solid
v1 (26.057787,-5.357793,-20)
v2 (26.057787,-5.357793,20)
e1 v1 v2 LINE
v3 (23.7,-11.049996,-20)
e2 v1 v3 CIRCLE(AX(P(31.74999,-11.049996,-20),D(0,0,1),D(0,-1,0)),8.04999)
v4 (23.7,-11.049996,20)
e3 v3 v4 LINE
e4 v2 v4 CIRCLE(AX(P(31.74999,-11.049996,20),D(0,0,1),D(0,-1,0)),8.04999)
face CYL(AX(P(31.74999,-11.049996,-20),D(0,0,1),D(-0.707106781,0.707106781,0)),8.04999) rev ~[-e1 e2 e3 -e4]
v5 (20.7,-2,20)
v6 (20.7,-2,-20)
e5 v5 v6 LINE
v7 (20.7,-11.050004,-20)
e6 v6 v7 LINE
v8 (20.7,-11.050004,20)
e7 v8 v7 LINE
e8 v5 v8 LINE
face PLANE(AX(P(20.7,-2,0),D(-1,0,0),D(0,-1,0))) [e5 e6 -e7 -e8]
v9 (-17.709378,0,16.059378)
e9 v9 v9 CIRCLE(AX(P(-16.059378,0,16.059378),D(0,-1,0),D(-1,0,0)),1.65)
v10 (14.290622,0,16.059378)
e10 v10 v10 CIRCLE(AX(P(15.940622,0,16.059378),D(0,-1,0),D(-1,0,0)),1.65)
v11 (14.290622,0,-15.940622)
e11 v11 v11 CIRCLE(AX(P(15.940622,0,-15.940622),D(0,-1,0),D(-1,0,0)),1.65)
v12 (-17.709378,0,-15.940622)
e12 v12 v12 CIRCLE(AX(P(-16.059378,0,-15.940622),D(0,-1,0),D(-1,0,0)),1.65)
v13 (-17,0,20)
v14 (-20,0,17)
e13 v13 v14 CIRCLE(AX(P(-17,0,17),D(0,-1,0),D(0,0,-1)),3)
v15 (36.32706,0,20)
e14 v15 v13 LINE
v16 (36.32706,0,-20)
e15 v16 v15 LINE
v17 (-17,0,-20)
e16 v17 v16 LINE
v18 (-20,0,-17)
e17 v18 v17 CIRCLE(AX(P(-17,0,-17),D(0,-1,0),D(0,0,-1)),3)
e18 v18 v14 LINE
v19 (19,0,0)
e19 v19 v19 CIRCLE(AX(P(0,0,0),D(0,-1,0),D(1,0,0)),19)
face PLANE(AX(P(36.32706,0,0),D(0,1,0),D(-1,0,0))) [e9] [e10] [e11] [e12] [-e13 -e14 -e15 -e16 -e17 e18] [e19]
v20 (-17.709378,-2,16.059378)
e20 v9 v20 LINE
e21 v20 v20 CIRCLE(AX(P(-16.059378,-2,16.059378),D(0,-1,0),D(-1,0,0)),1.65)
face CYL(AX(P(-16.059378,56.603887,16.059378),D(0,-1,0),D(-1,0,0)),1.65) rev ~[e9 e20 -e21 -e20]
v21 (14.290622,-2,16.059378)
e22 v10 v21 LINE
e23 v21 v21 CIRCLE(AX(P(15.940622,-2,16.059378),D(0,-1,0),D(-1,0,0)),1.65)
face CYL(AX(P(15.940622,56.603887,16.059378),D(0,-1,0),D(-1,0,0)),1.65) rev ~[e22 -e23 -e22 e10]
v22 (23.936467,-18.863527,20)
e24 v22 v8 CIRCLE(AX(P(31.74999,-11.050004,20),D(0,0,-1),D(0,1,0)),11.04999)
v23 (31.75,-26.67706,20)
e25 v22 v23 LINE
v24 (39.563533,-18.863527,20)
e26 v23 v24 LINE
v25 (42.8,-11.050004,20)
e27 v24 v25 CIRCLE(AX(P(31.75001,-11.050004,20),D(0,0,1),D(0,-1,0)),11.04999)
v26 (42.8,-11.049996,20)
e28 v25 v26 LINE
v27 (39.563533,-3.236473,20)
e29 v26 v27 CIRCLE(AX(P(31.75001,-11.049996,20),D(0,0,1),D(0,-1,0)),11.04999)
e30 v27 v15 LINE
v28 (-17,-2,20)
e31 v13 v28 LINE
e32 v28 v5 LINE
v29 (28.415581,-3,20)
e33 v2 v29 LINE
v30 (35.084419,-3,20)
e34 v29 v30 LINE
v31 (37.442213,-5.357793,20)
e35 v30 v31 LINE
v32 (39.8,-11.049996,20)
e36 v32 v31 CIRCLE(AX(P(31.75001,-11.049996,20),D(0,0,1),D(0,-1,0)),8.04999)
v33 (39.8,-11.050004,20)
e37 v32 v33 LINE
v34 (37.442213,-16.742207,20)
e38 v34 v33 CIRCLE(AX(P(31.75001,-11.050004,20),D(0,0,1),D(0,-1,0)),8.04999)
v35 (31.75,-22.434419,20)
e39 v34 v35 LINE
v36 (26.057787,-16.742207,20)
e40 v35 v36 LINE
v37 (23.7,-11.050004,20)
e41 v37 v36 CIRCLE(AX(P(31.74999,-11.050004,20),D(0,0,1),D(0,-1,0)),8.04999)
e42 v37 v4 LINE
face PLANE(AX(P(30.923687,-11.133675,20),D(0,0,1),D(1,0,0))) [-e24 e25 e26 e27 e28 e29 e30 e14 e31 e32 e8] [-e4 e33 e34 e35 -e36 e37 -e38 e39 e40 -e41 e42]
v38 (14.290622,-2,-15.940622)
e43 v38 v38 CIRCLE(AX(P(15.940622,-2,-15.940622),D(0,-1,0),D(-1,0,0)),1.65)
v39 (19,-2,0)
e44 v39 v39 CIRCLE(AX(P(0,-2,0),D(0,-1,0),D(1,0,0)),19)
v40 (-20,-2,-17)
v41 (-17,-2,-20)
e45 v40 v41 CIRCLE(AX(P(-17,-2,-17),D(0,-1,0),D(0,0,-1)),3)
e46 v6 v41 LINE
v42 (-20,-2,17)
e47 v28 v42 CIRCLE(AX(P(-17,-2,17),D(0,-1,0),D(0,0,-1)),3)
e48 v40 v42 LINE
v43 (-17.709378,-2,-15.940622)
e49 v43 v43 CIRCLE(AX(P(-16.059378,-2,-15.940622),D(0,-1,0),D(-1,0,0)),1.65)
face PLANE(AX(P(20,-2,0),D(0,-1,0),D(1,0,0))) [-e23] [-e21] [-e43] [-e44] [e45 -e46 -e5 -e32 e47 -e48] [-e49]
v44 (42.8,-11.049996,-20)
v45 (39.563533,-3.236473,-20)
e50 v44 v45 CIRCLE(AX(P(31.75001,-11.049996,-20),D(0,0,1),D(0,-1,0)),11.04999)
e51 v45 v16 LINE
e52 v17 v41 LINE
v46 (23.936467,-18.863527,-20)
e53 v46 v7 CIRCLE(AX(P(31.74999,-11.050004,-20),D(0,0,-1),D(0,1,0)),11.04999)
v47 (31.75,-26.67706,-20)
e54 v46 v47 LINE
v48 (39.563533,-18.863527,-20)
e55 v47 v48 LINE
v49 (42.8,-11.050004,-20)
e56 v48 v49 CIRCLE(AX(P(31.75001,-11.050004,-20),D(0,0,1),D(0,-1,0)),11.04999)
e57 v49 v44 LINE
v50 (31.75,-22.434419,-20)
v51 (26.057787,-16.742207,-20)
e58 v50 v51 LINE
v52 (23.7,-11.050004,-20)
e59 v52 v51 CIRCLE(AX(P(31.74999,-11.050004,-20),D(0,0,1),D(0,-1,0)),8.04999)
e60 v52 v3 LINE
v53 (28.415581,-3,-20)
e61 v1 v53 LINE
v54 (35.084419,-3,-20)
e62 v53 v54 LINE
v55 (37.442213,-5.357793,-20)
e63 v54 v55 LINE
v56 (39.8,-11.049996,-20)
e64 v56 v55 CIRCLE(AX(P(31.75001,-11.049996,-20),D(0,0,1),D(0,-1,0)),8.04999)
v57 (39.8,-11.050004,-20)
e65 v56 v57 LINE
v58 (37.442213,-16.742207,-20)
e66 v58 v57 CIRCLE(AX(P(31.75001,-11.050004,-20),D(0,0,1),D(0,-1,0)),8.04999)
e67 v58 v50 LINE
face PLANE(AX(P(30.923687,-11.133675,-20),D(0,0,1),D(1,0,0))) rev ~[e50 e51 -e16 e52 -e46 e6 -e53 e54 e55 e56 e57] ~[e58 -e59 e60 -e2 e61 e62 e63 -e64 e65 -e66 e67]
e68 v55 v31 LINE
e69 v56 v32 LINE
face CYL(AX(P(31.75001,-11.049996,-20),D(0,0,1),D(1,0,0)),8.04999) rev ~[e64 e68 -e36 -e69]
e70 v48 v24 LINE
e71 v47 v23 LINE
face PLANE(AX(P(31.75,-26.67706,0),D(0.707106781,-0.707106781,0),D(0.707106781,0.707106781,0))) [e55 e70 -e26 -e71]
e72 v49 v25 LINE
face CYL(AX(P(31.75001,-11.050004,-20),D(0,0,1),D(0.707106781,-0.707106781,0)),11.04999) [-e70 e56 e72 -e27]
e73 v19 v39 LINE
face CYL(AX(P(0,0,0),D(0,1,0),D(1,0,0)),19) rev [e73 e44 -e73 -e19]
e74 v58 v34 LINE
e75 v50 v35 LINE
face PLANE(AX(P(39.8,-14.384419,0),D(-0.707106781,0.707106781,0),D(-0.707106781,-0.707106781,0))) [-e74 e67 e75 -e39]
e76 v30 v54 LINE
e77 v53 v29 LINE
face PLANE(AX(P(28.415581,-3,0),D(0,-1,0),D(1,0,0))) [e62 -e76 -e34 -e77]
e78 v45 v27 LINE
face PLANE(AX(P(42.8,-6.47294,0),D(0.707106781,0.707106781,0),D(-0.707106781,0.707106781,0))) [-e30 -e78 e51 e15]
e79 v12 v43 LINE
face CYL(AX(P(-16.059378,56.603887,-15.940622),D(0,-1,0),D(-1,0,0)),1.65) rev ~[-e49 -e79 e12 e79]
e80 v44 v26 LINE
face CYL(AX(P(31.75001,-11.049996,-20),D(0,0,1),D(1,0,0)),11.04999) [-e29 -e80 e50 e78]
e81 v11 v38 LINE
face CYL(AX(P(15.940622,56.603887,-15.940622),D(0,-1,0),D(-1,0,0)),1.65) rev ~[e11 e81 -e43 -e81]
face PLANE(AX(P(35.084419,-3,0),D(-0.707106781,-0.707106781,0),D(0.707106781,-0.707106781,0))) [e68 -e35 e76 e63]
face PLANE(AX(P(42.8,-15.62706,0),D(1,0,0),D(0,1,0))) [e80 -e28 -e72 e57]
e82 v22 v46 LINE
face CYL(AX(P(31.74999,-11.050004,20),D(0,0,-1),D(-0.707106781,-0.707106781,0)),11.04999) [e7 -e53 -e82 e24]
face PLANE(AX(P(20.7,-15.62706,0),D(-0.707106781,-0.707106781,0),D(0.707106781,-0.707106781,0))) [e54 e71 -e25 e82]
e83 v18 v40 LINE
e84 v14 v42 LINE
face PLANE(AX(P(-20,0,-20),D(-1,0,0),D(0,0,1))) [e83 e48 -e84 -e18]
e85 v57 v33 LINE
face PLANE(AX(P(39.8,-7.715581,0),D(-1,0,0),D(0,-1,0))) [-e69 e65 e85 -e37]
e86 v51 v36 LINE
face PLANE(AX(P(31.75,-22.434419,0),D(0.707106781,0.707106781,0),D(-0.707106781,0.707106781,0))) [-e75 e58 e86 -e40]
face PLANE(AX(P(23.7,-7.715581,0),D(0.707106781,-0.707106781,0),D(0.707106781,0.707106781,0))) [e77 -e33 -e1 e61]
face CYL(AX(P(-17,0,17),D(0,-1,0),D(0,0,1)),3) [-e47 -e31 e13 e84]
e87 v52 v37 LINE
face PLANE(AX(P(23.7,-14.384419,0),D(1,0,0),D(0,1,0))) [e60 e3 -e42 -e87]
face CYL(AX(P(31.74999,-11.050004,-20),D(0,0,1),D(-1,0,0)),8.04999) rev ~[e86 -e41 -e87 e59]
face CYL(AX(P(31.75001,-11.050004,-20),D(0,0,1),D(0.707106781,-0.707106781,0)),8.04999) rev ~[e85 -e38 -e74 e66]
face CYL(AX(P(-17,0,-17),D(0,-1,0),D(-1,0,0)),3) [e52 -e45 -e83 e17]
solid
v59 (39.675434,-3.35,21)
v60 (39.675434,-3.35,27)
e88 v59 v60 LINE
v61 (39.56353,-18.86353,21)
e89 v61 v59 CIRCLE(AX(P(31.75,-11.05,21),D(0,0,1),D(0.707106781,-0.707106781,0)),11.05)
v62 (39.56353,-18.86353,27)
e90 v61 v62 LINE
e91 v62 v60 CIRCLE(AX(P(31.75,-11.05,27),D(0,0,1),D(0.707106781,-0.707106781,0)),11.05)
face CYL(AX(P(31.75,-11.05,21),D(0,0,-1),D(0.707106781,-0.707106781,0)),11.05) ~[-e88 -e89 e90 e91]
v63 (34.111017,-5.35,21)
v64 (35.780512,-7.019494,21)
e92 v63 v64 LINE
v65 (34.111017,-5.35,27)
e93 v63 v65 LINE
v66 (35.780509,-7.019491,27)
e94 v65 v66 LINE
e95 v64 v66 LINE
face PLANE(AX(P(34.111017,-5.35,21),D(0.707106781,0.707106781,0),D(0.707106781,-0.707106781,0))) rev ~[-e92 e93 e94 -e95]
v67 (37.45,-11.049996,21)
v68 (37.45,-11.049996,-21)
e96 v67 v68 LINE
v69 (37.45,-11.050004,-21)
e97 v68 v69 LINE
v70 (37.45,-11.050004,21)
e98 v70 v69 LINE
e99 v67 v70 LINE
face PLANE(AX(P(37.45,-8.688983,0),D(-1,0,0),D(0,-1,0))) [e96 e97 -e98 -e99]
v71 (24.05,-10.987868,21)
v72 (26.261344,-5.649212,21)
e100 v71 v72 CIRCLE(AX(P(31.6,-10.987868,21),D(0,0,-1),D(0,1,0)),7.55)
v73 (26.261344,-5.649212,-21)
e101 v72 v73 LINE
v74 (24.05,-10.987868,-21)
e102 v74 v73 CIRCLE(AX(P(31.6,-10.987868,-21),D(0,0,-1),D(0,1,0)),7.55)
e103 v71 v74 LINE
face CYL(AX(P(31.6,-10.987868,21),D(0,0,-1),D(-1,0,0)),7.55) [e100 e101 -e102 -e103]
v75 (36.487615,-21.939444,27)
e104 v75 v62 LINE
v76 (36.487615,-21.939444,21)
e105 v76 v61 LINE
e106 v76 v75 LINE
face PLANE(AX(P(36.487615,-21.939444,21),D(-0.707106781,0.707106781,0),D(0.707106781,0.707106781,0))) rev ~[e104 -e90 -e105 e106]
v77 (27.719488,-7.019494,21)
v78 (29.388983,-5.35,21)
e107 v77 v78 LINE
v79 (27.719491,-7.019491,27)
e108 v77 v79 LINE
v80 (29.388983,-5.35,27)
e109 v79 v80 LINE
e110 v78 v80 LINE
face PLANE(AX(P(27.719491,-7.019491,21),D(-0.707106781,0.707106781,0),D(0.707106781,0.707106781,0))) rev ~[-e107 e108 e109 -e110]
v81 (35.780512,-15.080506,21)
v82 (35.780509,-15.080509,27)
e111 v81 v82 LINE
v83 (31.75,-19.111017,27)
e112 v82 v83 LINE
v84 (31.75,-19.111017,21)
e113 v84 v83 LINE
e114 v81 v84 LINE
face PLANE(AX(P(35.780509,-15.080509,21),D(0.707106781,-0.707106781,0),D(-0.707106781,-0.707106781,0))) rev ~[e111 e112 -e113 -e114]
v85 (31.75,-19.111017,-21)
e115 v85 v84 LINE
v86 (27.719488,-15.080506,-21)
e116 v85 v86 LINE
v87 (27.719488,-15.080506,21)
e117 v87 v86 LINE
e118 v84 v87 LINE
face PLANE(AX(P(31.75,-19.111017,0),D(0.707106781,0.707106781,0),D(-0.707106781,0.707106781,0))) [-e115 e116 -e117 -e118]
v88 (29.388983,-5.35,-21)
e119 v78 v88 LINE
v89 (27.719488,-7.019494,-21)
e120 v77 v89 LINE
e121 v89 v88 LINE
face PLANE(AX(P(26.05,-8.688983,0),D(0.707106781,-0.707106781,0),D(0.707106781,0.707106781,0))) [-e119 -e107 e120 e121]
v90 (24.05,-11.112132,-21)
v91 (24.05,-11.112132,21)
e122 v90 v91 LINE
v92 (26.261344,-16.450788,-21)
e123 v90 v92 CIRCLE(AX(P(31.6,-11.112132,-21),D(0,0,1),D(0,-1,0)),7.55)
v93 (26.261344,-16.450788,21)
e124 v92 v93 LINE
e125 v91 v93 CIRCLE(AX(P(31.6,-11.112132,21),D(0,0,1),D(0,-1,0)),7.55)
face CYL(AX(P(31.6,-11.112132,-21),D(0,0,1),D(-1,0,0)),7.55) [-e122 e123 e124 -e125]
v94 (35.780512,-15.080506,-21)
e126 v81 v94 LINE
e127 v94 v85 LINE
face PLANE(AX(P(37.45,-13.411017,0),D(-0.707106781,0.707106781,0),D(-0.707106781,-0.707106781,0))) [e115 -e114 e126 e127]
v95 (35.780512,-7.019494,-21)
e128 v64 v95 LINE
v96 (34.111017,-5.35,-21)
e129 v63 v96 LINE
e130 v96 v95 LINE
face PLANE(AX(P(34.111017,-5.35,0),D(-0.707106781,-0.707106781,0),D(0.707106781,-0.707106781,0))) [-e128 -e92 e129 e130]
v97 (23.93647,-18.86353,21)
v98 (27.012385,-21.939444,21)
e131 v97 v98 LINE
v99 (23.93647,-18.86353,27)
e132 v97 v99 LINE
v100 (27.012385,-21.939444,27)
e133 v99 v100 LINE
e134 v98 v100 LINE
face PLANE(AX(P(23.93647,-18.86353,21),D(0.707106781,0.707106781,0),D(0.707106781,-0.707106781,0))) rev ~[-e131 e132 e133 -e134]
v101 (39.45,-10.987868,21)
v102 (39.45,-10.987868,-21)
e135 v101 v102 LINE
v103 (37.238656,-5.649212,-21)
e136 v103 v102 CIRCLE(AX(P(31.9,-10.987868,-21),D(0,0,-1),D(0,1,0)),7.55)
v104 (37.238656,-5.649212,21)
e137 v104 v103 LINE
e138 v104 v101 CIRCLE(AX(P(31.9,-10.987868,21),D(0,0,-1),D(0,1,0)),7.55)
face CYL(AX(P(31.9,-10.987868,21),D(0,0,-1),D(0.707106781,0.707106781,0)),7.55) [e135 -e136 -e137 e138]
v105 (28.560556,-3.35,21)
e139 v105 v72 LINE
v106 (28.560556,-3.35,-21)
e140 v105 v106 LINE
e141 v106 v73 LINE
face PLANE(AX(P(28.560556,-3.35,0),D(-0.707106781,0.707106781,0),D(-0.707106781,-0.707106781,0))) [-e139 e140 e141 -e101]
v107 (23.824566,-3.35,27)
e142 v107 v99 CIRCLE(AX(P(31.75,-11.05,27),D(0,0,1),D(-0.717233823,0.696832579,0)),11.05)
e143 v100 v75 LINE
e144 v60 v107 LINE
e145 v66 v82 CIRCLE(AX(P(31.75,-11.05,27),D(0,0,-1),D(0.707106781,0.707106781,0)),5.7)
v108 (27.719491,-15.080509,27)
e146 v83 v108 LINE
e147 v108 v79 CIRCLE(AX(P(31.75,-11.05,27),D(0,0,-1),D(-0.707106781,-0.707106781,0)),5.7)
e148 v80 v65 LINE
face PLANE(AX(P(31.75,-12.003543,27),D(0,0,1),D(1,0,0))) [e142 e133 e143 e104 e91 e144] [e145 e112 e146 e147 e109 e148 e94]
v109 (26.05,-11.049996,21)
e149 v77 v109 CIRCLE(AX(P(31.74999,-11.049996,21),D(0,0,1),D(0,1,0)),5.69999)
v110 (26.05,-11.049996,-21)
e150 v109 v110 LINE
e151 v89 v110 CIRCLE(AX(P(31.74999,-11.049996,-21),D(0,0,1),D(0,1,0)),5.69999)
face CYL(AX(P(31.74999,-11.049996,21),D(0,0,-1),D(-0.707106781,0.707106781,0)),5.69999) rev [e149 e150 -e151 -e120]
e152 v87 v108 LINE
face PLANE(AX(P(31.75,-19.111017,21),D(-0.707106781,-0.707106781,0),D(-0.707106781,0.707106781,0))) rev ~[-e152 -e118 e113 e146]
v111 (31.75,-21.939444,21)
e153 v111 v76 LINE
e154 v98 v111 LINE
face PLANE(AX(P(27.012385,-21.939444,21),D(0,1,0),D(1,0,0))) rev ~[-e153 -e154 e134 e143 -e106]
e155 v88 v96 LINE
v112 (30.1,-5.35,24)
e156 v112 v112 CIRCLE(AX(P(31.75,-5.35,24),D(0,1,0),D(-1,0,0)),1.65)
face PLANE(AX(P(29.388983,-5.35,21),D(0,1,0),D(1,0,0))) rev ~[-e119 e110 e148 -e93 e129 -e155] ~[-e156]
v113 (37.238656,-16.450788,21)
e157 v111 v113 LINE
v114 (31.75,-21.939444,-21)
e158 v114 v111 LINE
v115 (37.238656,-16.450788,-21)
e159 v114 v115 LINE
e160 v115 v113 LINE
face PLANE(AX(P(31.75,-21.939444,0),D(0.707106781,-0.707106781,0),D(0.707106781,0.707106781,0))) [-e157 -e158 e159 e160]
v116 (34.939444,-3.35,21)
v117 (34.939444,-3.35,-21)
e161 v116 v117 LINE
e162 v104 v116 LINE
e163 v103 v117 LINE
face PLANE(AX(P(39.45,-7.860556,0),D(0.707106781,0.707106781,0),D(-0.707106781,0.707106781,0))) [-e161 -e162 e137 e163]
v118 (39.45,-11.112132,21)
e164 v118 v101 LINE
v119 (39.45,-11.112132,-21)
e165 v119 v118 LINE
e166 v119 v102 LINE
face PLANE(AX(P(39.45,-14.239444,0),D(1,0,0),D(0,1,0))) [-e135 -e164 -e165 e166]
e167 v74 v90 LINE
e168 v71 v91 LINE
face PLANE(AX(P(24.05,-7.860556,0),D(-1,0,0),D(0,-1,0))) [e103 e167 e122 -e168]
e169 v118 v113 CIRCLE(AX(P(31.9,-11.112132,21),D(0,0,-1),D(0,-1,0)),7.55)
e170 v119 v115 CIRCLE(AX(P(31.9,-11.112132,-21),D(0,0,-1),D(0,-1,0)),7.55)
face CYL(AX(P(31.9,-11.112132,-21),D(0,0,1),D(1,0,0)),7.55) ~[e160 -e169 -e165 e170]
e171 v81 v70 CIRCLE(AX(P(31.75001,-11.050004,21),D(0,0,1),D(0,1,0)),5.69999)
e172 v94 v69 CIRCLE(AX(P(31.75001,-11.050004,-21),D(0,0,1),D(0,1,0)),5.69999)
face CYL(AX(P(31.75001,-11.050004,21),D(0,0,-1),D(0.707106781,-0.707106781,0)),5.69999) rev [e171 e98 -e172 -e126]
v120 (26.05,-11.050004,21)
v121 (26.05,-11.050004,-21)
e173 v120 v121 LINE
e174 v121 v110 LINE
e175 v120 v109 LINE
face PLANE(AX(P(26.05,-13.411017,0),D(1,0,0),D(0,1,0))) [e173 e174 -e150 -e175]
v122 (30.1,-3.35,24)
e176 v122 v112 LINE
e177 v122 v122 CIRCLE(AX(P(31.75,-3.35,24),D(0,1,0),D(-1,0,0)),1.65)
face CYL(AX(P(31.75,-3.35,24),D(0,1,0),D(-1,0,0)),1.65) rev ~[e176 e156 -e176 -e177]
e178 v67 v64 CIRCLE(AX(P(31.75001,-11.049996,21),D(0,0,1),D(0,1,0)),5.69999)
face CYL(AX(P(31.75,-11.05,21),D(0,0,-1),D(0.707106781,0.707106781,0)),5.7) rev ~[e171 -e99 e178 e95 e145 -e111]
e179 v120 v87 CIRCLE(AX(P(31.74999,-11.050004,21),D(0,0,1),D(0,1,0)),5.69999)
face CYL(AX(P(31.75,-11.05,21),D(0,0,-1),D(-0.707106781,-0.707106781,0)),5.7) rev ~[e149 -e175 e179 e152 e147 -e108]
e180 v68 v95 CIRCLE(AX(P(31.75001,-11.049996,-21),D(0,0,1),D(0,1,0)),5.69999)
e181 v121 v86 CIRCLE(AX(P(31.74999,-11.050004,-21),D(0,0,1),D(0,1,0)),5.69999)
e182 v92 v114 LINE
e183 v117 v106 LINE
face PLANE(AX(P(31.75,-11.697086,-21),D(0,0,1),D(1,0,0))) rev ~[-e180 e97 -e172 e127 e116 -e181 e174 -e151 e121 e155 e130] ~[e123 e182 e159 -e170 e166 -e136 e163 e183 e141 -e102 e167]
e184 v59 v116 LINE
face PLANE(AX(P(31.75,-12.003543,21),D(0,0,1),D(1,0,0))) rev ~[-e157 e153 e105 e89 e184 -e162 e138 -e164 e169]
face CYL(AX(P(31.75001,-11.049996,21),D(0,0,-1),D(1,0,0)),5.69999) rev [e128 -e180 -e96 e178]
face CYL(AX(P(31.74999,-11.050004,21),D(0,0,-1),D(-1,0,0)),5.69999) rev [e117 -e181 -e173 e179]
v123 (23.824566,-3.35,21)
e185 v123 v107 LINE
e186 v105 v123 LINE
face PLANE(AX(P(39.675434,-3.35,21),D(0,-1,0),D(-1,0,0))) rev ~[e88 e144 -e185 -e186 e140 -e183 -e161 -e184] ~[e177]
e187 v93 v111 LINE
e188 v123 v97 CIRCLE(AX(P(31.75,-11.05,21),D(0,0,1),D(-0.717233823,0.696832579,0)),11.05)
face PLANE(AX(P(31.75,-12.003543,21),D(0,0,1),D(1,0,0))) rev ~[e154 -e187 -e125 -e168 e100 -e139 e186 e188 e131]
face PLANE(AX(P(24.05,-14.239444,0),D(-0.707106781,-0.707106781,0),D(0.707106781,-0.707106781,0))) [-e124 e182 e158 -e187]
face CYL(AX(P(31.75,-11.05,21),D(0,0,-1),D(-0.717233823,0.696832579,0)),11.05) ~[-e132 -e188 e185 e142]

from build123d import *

# Parameters (mm, degrees)
F0_W      = 40
F0_H      = 40
F0_R      = 19
F1_DEPTH  = 2
F2_D      = 3.3
F4_DEPTH  = 20
F5_R      = 8.04999
F6_R      = 11.04999
F8_DEPTH  = 21
F9_R      = 7.55
F10_R     = 5.69999
F12_DEPTH = 6
F13_R     = 1.65
F14_DEPTH = 5
F15_R     = 3


# Not quite as in the source:
# - a fillet or chamfer is up to 0.001 mm smaller than in the source, because OpenCascade refuses the exact size


with BuildPart() as f1:
    # F0 (on Front) → F1 (new body)
    with BuildSketch(Plane.XZ):
        Rectangle(F0_W, F0_H)
        Circle(F0_R, mode=Mode.SUBTRACT)
    extrude(amount=F1_DEPTH)

    # F2 (through all)
    with Locations(Plane(origin=(0, 0, 0), x_dir=(1, 0, 0), z_dir=(0, 1, 0))):
        with Locations((-16.059378162, -16.059378162), (15.940621838, -16.059378162), (15.940621838, 15.940621838), (-16.059378162, 15.940621838)):
            Hole(F2_D / 2)

    # F3 (on Top) → F4 (join, symmetric)
    with BuildSketch(Plane.XY):
        Polygon((20.7, -15.6270598642), (27.1729401358, -22.1), (31.75, -26.6770598642), (36.3270598642, -22.1), (42.8, -15.6270598642), (42.8, -6.4729401358), (36.3270598642, 0), (27.1729401358, 0), (20, 0), (20, -2), (20.7, -2), (20.7, -6.4729401358), align=None)
        Polygon((39.8, -7.7155808229), (39.8, -14.3844191771), (35.0844191771, -19.1), (31.75, -22.4344191771), (28.4155808229, -19.1), (23.7, -14.3844191771), (23.7, -7.7155808229), (28.4155808229, -3), (35.0844191771, -3), align=None, mode=Mode.SUBTRACT)
    extrude(amount=F4_DEPTH, both=True)

    # F5 (radius 8.05 in the source; OpenCascade refuses exactly that, so slightly less here)
    f5_edges = [f1.edges().sort_by_distance(p)[0] for p in [
        (23.7, -7.715581, 0),
        (23.7, -14.384419, 0),
        (39.8, -7.715581, 0),
        (39.8, -14.384419, 0),
    ]]
    fillet(f5_edges, radius=F5_R)

    # F6 (radius 11.05 in the source; OpenCascade refuses exactly that, so slightly less here)
    f6_edges = [f1.edges().sort_by_distance(p)[0] for p in [
        (20.7, -15.62706, 0),
        (42.8, -15.62706, 0),
        (42.8, -6.47294, 0),
    ]]
    fillet(f6_edges, radius=F6_R)

    # F15
    f15_edges = [f1.edges().sort_by_distance(p)[0] for p in [
        (-20, -1, 20),
        (-20, -1, -20),
    ]]
    fillet(f15_edges, radius=F15_R)


with BuildPart() as f8:
    # F7 (on Top) → F8 (new body, symmetric)
    with BuildSketch(Plane.XY):
        Polygon((24.05, -7.8605555697), (24.05, -14.2394444303), (31.75, -21.9394444303), (39.45, -14.2394444303), (39.45, -7.8605555697), (34.9394444303, -3.35), (28.5605555697, -3.35), align=None)
        Polygon((31.75, -19.1110173055), (26.05, -13.4110173055), (26.05, -8.6889826945), (29.3889826945, -5.35), (34.1110173055, -5.35), (37.45, -8.6889826945), (37.45, -13.4110173055), align=None, mode=Mode.SUBTRACT)
    extrude(amount=F8_DEPTH, both=True)

    # F9
    f9_edges = [f8.edges().sort_by_distance(p)[0] for p in [
        (39.45, -14.239444, 0),
        (39.45, -7.860556, 0),
        (24.05, -14.239444, 0),
        (24.05, -7.860556, 0),
    ]]
    fillet(f9_edges, radius=F9_R)

    # F10 (radius 5.7 in the source; OpenCascade refuses exactly that, so slightly less here)
    f10_edges = [f8.edges().sort_by_distance(p)[0] for p in [
        (37.45, -8.688983, 0),
        (37.45, -13.411017, 0),
        (26.05, -8.688983, 0),
        (26.05, -13.411017, 0),
    ]]
    fillet(f10_edges, radius=F10_R)

    # F11 (on face) → F12 (join)
    with BuildSketch(Plane.XY.offset(21)):
        with BuildLine():
            ThreePointArc((23.8245662579, -3.35), (20.7002874642, -11.1297049374), (23.9364700679, -18.8635299321))
            Line((23.9364700679, -18.8635299321), (27.0123845661, -21.9394444303))
            Line((27.0123845661, -21.9394444303), (36.4876154339, -21.9394444303))
            Line((36.4876154339, -21.9394444303), (39.5635299321, -18.8635299321))
            ThreePointArc((39.5635299321, -18.8635299321), (42.7997125358, -11.1297049374), (39.6754337421, -3.35))
            Line((39.6754337421, -3.35), (23.8245662579, -3.35))
        make_face()
        with BuildLine():
            Line((27.7194913472, -7.0194913472), (29.3889826945, -5.35))
            Line((29.3889826945, -5.35), (34.1110173055, -5.35))
            Line((34.1110173055, -5.35), (35.7805086528, -7.0194913472))
            ThreePointArc((35.7805086528, -7.0194913472), (37.45, -11.05), (35.7805086528, -15.0805086528))
            Line((35.7805086528, -15.0805086528), (31.75, -19.1110173055))
            Line((31.75, -19.1110173055), (27.7194913472, -15.0805086528))
            ThreePointArc((27.7194913472, -15.0805086528), (26.05, -11.05), (27.7194913472, -7.0194913472))
        make_face(mode=Mode.SUBTRACT)
    extrude(amount=F12_DEPTH)

    # F13 (on face) → F14 (cut)
    with BuildSketch(Plane(origin=(0, -3.35, 0), x_dir=(-1, 0, 0), z_dir=(0, 1, 0))):
        with Locations((-31.75, 24)):
            Circle(F13_R)
    extrude(amount=-F14_DEPTH, mode=Mode.SUBTRACT)


solid = Compound([f1.part, f8.part])
